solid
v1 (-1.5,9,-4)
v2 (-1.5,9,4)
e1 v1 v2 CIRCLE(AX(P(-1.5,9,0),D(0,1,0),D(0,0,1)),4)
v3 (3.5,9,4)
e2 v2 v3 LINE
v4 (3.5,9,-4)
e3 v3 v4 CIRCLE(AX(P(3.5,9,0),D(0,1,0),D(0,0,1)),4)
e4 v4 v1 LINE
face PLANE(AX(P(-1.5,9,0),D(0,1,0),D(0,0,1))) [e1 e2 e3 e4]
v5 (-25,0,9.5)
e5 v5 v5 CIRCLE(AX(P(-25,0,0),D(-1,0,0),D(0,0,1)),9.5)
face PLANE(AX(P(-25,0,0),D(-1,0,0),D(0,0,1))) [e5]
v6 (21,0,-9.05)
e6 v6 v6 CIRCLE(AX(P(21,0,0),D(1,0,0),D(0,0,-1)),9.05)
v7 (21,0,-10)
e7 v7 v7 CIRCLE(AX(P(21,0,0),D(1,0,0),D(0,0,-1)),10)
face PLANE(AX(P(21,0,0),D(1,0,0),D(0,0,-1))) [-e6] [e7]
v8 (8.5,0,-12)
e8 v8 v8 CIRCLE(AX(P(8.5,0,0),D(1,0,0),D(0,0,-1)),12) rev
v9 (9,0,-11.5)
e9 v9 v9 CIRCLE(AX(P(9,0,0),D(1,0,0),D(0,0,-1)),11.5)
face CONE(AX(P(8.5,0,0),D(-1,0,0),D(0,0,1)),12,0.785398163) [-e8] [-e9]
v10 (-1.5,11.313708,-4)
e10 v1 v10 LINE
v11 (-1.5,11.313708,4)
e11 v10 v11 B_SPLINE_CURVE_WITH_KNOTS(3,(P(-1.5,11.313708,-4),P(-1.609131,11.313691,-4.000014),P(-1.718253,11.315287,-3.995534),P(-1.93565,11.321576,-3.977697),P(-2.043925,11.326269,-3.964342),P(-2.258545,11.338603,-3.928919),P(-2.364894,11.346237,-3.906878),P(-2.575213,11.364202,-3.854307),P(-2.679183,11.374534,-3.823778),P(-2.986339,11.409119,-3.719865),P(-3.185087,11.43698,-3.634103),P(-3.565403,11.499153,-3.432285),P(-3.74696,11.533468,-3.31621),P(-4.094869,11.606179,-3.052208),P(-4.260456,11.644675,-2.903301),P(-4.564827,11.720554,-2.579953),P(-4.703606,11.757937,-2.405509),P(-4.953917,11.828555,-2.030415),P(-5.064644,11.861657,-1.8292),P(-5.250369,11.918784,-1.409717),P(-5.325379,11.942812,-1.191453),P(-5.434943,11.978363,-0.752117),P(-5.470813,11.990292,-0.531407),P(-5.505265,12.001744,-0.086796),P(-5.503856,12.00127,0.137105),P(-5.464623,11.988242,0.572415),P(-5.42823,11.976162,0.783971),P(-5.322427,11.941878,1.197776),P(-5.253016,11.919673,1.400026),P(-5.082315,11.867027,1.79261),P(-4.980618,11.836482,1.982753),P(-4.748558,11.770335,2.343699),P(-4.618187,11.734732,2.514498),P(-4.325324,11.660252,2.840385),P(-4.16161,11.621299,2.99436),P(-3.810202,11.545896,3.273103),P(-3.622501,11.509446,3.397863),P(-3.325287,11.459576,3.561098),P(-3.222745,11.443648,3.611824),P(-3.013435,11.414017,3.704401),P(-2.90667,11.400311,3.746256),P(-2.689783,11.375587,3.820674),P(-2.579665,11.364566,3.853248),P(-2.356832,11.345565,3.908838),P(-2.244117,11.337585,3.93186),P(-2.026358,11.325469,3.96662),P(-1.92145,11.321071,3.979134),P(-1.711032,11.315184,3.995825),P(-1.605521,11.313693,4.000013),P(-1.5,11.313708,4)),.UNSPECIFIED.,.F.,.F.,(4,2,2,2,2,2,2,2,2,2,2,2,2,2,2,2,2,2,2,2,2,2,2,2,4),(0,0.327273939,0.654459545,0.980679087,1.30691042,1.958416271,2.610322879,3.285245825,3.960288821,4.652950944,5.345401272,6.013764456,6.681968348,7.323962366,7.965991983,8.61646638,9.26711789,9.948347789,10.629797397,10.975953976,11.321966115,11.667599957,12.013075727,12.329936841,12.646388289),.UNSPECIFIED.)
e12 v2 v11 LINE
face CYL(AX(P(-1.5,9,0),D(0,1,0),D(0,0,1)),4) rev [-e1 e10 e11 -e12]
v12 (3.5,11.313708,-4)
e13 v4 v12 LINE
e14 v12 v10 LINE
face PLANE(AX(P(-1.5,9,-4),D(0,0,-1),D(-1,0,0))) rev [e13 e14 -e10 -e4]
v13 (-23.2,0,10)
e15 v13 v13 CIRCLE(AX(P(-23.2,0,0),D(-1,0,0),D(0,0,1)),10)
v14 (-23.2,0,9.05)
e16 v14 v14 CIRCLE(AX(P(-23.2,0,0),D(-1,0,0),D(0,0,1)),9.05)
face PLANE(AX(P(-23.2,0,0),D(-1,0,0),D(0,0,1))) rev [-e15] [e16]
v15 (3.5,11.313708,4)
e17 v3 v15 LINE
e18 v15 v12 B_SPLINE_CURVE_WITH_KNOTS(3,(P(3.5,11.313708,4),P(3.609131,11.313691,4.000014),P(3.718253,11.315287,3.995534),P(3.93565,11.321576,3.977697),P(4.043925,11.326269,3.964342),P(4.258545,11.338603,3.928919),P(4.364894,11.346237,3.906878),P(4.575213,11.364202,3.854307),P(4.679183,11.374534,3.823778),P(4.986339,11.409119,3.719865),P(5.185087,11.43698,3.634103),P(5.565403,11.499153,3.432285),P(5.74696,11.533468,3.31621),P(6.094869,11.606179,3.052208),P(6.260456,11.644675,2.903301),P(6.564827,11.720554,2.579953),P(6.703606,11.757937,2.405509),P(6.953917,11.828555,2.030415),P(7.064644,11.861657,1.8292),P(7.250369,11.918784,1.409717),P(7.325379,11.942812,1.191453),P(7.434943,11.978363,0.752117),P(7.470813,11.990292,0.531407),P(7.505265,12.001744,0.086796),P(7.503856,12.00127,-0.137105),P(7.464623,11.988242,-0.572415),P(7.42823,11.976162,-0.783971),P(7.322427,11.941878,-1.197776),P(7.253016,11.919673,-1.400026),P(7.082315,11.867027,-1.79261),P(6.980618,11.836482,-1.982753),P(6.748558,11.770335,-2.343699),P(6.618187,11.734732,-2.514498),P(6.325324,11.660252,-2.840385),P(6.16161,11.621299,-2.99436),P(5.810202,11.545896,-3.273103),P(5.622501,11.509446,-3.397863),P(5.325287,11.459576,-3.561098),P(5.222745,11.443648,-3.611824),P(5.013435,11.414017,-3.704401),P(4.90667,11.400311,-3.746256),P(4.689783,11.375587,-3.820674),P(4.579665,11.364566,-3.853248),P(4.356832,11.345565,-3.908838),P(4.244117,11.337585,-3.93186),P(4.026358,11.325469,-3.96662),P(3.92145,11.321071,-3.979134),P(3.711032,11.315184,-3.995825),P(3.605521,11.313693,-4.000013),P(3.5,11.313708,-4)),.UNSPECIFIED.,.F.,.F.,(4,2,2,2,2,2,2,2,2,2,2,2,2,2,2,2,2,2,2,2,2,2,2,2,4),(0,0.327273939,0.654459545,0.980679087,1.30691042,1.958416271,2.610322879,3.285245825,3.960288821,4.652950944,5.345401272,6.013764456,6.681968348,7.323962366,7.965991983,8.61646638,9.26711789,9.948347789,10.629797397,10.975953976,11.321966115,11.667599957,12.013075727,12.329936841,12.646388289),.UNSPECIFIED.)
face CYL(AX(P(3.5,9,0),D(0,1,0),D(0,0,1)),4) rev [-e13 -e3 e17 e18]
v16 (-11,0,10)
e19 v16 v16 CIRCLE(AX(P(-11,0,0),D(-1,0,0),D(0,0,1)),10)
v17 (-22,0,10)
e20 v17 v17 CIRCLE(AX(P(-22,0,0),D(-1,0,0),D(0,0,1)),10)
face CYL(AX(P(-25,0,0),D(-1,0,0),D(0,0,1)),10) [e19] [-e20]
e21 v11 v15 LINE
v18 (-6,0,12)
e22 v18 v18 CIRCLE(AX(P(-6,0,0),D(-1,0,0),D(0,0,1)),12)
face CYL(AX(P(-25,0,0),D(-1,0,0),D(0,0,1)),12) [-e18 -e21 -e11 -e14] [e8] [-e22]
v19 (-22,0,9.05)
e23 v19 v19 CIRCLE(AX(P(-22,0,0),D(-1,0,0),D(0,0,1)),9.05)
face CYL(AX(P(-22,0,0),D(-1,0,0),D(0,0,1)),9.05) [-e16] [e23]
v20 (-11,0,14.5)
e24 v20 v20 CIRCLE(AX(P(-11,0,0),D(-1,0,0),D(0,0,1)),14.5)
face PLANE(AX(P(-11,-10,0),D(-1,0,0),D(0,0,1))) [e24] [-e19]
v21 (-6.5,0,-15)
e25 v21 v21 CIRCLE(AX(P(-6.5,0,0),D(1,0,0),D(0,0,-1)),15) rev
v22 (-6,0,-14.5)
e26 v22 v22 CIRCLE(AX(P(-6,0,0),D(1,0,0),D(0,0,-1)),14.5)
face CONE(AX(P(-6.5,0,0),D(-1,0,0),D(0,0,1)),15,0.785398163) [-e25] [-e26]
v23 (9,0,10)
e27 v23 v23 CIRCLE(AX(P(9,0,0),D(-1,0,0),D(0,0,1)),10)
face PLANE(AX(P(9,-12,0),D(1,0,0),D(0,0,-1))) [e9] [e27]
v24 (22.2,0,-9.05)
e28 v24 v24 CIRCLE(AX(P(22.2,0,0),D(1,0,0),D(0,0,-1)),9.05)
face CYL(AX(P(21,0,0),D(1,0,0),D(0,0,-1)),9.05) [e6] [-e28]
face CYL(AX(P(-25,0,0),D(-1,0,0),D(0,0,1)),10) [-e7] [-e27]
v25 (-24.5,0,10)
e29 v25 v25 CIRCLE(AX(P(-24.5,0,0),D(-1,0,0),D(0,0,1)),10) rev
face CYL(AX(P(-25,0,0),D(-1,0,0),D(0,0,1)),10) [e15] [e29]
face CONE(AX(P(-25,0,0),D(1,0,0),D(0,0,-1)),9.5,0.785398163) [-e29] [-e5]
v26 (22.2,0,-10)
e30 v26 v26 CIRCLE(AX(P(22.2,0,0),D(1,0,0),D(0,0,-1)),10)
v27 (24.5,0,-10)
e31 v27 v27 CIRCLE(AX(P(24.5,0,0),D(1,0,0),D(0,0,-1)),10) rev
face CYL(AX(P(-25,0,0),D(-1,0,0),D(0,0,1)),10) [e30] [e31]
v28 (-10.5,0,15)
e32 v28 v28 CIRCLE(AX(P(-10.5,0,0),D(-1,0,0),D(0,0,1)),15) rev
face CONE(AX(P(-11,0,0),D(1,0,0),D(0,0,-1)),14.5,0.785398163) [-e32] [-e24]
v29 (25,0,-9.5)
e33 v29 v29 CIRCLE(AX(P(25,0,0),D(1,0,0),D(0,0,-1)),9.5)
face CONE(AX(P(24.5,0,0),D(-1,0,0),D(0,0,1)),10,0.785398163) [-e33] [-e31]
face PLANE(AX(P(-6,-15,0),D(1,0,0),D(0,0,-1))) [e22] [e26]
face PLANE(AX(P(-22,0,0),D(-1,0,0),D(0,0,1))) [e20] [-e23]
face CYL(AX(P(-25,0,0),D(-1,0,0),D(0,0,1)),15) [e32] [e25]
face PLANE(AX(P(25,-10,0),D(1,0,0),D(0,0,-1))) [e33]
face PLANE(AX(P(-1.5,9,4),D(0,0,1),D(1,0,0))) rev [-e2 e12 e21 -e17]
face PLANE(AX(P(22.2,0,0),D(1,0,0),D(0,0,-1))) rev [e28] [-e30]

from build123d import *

# Parameters (mm, degrees)
SCHIZZO2_R               = 10
SCHIZZO2_R_2             = 9.05
TAGLIO_ESTRUSIONE1_DEPTH = 1.2
TAGLIO_ESTRUSIONE2_START = -1.2
SCHIZZO3_R               = 10
SCHIZZO3_R_2             = 9.05
TAGLIO_ESTRUSIONE2_DEPTH = 1.2
SMUSSO1_SIZE             = 0.5
TAGLIO_ESTRUSIONE5_START = 9
TAGLIO_ESTRUSIONE5_DEPTH = 3.0000001


with BuildPart() as part:
    # Schizzo1 → Rivoluzione1 (revolve)
    with BuildSketch(Plane.XY, mode=Mode.PRIVATE) as rivoluzione1_sk:
        Polygon((-25, 0), (25, 0), (25, -10), (9, -10), (9, -12), (-6, -12), (-6, -15), (-11, -15), (-11, -10), (-25, -10), align=None)
    revolve(rivoluzione1_sk.sketch.rotate(Axis((-25, 0, 0), (1, 0, 0)), 270), axis=Axis((-25, 0, 0), (1, 0, 0)))

    # Schizzo2 → Taglio-Estrusione1 (cut)
    with BuildSketch(Plane.ZY.offset(23.2)):
        Circle(SCHIZZO2_R)
        Circle(SCHIZZO2_R_2, mode=Mode.SUBTRACT)
    extrude(amount=-TAGLIO_ESTRUSIONE1_DEPTH, mode=Mode.SUBTRACT)

    # Schizzo3 → Taglio-Estrusione2 (cut)
    with BuildSketch(Plane(origin=(22.2, 0, 0), x_dir=(0, 0, -1), z_dir=(1, 0, 0)).offset(TAGLIO_ESTRUSIONE2_START)):
        with Locations(Location((0, 0, 0), (0, 0, 180))):
            Circle(SCHIZZO3_R)
        with Locations(Location((0, 0, 0), (0, 0, 180))):
            Circle(SCHIZZO3_R_2, mode=Mode.SUBTRACT)
    extrude(amount=TAGLIO_ESTRUSIONE2_DEPTH, mode=Mode.SUBTRACT)

    # Smusso1
    smusso1_edges = [part.edges().sort_by_distance(p)[0] for p in [
        (-6, 0, -15),
        (-11, 0, -15),
        (-25, 0, -10),
        (25, 0, -10),
        (9, 0, -12),
    ]]
    chamfer(smusso1_edges, length=SMUSSO1_SIZE)

    # Taglio-Estrusione5: read off the stored shape, not the designer's step
    # Taglio-Estrusione5 outline → Taglio-Estrusione5 (cut)
    with BuildSketch(Plane(origin=(0, 0, 0), x_dir=(1, 0, 0), z_dir=(0, 1, 0)).offset(TAGLIO_ESTRUSIONE5_START)):
        with BuildLine():
            Line((3.5, 4), (-1.5, 4))
            ThreePointArc((-1.5, 4), (-5.5, 0), (-1.5, -4))
            Line((-1.5, -4), (3.5, -4))
            ThreePointArc((3.5, -4), (7.5, 0), (3.5, 4))
        make_face()
    extrude(amount=TAGLIO_ESTRUSIONE5_DEPTH, mode=Mode.SUBTRACT)


solid = part.part
